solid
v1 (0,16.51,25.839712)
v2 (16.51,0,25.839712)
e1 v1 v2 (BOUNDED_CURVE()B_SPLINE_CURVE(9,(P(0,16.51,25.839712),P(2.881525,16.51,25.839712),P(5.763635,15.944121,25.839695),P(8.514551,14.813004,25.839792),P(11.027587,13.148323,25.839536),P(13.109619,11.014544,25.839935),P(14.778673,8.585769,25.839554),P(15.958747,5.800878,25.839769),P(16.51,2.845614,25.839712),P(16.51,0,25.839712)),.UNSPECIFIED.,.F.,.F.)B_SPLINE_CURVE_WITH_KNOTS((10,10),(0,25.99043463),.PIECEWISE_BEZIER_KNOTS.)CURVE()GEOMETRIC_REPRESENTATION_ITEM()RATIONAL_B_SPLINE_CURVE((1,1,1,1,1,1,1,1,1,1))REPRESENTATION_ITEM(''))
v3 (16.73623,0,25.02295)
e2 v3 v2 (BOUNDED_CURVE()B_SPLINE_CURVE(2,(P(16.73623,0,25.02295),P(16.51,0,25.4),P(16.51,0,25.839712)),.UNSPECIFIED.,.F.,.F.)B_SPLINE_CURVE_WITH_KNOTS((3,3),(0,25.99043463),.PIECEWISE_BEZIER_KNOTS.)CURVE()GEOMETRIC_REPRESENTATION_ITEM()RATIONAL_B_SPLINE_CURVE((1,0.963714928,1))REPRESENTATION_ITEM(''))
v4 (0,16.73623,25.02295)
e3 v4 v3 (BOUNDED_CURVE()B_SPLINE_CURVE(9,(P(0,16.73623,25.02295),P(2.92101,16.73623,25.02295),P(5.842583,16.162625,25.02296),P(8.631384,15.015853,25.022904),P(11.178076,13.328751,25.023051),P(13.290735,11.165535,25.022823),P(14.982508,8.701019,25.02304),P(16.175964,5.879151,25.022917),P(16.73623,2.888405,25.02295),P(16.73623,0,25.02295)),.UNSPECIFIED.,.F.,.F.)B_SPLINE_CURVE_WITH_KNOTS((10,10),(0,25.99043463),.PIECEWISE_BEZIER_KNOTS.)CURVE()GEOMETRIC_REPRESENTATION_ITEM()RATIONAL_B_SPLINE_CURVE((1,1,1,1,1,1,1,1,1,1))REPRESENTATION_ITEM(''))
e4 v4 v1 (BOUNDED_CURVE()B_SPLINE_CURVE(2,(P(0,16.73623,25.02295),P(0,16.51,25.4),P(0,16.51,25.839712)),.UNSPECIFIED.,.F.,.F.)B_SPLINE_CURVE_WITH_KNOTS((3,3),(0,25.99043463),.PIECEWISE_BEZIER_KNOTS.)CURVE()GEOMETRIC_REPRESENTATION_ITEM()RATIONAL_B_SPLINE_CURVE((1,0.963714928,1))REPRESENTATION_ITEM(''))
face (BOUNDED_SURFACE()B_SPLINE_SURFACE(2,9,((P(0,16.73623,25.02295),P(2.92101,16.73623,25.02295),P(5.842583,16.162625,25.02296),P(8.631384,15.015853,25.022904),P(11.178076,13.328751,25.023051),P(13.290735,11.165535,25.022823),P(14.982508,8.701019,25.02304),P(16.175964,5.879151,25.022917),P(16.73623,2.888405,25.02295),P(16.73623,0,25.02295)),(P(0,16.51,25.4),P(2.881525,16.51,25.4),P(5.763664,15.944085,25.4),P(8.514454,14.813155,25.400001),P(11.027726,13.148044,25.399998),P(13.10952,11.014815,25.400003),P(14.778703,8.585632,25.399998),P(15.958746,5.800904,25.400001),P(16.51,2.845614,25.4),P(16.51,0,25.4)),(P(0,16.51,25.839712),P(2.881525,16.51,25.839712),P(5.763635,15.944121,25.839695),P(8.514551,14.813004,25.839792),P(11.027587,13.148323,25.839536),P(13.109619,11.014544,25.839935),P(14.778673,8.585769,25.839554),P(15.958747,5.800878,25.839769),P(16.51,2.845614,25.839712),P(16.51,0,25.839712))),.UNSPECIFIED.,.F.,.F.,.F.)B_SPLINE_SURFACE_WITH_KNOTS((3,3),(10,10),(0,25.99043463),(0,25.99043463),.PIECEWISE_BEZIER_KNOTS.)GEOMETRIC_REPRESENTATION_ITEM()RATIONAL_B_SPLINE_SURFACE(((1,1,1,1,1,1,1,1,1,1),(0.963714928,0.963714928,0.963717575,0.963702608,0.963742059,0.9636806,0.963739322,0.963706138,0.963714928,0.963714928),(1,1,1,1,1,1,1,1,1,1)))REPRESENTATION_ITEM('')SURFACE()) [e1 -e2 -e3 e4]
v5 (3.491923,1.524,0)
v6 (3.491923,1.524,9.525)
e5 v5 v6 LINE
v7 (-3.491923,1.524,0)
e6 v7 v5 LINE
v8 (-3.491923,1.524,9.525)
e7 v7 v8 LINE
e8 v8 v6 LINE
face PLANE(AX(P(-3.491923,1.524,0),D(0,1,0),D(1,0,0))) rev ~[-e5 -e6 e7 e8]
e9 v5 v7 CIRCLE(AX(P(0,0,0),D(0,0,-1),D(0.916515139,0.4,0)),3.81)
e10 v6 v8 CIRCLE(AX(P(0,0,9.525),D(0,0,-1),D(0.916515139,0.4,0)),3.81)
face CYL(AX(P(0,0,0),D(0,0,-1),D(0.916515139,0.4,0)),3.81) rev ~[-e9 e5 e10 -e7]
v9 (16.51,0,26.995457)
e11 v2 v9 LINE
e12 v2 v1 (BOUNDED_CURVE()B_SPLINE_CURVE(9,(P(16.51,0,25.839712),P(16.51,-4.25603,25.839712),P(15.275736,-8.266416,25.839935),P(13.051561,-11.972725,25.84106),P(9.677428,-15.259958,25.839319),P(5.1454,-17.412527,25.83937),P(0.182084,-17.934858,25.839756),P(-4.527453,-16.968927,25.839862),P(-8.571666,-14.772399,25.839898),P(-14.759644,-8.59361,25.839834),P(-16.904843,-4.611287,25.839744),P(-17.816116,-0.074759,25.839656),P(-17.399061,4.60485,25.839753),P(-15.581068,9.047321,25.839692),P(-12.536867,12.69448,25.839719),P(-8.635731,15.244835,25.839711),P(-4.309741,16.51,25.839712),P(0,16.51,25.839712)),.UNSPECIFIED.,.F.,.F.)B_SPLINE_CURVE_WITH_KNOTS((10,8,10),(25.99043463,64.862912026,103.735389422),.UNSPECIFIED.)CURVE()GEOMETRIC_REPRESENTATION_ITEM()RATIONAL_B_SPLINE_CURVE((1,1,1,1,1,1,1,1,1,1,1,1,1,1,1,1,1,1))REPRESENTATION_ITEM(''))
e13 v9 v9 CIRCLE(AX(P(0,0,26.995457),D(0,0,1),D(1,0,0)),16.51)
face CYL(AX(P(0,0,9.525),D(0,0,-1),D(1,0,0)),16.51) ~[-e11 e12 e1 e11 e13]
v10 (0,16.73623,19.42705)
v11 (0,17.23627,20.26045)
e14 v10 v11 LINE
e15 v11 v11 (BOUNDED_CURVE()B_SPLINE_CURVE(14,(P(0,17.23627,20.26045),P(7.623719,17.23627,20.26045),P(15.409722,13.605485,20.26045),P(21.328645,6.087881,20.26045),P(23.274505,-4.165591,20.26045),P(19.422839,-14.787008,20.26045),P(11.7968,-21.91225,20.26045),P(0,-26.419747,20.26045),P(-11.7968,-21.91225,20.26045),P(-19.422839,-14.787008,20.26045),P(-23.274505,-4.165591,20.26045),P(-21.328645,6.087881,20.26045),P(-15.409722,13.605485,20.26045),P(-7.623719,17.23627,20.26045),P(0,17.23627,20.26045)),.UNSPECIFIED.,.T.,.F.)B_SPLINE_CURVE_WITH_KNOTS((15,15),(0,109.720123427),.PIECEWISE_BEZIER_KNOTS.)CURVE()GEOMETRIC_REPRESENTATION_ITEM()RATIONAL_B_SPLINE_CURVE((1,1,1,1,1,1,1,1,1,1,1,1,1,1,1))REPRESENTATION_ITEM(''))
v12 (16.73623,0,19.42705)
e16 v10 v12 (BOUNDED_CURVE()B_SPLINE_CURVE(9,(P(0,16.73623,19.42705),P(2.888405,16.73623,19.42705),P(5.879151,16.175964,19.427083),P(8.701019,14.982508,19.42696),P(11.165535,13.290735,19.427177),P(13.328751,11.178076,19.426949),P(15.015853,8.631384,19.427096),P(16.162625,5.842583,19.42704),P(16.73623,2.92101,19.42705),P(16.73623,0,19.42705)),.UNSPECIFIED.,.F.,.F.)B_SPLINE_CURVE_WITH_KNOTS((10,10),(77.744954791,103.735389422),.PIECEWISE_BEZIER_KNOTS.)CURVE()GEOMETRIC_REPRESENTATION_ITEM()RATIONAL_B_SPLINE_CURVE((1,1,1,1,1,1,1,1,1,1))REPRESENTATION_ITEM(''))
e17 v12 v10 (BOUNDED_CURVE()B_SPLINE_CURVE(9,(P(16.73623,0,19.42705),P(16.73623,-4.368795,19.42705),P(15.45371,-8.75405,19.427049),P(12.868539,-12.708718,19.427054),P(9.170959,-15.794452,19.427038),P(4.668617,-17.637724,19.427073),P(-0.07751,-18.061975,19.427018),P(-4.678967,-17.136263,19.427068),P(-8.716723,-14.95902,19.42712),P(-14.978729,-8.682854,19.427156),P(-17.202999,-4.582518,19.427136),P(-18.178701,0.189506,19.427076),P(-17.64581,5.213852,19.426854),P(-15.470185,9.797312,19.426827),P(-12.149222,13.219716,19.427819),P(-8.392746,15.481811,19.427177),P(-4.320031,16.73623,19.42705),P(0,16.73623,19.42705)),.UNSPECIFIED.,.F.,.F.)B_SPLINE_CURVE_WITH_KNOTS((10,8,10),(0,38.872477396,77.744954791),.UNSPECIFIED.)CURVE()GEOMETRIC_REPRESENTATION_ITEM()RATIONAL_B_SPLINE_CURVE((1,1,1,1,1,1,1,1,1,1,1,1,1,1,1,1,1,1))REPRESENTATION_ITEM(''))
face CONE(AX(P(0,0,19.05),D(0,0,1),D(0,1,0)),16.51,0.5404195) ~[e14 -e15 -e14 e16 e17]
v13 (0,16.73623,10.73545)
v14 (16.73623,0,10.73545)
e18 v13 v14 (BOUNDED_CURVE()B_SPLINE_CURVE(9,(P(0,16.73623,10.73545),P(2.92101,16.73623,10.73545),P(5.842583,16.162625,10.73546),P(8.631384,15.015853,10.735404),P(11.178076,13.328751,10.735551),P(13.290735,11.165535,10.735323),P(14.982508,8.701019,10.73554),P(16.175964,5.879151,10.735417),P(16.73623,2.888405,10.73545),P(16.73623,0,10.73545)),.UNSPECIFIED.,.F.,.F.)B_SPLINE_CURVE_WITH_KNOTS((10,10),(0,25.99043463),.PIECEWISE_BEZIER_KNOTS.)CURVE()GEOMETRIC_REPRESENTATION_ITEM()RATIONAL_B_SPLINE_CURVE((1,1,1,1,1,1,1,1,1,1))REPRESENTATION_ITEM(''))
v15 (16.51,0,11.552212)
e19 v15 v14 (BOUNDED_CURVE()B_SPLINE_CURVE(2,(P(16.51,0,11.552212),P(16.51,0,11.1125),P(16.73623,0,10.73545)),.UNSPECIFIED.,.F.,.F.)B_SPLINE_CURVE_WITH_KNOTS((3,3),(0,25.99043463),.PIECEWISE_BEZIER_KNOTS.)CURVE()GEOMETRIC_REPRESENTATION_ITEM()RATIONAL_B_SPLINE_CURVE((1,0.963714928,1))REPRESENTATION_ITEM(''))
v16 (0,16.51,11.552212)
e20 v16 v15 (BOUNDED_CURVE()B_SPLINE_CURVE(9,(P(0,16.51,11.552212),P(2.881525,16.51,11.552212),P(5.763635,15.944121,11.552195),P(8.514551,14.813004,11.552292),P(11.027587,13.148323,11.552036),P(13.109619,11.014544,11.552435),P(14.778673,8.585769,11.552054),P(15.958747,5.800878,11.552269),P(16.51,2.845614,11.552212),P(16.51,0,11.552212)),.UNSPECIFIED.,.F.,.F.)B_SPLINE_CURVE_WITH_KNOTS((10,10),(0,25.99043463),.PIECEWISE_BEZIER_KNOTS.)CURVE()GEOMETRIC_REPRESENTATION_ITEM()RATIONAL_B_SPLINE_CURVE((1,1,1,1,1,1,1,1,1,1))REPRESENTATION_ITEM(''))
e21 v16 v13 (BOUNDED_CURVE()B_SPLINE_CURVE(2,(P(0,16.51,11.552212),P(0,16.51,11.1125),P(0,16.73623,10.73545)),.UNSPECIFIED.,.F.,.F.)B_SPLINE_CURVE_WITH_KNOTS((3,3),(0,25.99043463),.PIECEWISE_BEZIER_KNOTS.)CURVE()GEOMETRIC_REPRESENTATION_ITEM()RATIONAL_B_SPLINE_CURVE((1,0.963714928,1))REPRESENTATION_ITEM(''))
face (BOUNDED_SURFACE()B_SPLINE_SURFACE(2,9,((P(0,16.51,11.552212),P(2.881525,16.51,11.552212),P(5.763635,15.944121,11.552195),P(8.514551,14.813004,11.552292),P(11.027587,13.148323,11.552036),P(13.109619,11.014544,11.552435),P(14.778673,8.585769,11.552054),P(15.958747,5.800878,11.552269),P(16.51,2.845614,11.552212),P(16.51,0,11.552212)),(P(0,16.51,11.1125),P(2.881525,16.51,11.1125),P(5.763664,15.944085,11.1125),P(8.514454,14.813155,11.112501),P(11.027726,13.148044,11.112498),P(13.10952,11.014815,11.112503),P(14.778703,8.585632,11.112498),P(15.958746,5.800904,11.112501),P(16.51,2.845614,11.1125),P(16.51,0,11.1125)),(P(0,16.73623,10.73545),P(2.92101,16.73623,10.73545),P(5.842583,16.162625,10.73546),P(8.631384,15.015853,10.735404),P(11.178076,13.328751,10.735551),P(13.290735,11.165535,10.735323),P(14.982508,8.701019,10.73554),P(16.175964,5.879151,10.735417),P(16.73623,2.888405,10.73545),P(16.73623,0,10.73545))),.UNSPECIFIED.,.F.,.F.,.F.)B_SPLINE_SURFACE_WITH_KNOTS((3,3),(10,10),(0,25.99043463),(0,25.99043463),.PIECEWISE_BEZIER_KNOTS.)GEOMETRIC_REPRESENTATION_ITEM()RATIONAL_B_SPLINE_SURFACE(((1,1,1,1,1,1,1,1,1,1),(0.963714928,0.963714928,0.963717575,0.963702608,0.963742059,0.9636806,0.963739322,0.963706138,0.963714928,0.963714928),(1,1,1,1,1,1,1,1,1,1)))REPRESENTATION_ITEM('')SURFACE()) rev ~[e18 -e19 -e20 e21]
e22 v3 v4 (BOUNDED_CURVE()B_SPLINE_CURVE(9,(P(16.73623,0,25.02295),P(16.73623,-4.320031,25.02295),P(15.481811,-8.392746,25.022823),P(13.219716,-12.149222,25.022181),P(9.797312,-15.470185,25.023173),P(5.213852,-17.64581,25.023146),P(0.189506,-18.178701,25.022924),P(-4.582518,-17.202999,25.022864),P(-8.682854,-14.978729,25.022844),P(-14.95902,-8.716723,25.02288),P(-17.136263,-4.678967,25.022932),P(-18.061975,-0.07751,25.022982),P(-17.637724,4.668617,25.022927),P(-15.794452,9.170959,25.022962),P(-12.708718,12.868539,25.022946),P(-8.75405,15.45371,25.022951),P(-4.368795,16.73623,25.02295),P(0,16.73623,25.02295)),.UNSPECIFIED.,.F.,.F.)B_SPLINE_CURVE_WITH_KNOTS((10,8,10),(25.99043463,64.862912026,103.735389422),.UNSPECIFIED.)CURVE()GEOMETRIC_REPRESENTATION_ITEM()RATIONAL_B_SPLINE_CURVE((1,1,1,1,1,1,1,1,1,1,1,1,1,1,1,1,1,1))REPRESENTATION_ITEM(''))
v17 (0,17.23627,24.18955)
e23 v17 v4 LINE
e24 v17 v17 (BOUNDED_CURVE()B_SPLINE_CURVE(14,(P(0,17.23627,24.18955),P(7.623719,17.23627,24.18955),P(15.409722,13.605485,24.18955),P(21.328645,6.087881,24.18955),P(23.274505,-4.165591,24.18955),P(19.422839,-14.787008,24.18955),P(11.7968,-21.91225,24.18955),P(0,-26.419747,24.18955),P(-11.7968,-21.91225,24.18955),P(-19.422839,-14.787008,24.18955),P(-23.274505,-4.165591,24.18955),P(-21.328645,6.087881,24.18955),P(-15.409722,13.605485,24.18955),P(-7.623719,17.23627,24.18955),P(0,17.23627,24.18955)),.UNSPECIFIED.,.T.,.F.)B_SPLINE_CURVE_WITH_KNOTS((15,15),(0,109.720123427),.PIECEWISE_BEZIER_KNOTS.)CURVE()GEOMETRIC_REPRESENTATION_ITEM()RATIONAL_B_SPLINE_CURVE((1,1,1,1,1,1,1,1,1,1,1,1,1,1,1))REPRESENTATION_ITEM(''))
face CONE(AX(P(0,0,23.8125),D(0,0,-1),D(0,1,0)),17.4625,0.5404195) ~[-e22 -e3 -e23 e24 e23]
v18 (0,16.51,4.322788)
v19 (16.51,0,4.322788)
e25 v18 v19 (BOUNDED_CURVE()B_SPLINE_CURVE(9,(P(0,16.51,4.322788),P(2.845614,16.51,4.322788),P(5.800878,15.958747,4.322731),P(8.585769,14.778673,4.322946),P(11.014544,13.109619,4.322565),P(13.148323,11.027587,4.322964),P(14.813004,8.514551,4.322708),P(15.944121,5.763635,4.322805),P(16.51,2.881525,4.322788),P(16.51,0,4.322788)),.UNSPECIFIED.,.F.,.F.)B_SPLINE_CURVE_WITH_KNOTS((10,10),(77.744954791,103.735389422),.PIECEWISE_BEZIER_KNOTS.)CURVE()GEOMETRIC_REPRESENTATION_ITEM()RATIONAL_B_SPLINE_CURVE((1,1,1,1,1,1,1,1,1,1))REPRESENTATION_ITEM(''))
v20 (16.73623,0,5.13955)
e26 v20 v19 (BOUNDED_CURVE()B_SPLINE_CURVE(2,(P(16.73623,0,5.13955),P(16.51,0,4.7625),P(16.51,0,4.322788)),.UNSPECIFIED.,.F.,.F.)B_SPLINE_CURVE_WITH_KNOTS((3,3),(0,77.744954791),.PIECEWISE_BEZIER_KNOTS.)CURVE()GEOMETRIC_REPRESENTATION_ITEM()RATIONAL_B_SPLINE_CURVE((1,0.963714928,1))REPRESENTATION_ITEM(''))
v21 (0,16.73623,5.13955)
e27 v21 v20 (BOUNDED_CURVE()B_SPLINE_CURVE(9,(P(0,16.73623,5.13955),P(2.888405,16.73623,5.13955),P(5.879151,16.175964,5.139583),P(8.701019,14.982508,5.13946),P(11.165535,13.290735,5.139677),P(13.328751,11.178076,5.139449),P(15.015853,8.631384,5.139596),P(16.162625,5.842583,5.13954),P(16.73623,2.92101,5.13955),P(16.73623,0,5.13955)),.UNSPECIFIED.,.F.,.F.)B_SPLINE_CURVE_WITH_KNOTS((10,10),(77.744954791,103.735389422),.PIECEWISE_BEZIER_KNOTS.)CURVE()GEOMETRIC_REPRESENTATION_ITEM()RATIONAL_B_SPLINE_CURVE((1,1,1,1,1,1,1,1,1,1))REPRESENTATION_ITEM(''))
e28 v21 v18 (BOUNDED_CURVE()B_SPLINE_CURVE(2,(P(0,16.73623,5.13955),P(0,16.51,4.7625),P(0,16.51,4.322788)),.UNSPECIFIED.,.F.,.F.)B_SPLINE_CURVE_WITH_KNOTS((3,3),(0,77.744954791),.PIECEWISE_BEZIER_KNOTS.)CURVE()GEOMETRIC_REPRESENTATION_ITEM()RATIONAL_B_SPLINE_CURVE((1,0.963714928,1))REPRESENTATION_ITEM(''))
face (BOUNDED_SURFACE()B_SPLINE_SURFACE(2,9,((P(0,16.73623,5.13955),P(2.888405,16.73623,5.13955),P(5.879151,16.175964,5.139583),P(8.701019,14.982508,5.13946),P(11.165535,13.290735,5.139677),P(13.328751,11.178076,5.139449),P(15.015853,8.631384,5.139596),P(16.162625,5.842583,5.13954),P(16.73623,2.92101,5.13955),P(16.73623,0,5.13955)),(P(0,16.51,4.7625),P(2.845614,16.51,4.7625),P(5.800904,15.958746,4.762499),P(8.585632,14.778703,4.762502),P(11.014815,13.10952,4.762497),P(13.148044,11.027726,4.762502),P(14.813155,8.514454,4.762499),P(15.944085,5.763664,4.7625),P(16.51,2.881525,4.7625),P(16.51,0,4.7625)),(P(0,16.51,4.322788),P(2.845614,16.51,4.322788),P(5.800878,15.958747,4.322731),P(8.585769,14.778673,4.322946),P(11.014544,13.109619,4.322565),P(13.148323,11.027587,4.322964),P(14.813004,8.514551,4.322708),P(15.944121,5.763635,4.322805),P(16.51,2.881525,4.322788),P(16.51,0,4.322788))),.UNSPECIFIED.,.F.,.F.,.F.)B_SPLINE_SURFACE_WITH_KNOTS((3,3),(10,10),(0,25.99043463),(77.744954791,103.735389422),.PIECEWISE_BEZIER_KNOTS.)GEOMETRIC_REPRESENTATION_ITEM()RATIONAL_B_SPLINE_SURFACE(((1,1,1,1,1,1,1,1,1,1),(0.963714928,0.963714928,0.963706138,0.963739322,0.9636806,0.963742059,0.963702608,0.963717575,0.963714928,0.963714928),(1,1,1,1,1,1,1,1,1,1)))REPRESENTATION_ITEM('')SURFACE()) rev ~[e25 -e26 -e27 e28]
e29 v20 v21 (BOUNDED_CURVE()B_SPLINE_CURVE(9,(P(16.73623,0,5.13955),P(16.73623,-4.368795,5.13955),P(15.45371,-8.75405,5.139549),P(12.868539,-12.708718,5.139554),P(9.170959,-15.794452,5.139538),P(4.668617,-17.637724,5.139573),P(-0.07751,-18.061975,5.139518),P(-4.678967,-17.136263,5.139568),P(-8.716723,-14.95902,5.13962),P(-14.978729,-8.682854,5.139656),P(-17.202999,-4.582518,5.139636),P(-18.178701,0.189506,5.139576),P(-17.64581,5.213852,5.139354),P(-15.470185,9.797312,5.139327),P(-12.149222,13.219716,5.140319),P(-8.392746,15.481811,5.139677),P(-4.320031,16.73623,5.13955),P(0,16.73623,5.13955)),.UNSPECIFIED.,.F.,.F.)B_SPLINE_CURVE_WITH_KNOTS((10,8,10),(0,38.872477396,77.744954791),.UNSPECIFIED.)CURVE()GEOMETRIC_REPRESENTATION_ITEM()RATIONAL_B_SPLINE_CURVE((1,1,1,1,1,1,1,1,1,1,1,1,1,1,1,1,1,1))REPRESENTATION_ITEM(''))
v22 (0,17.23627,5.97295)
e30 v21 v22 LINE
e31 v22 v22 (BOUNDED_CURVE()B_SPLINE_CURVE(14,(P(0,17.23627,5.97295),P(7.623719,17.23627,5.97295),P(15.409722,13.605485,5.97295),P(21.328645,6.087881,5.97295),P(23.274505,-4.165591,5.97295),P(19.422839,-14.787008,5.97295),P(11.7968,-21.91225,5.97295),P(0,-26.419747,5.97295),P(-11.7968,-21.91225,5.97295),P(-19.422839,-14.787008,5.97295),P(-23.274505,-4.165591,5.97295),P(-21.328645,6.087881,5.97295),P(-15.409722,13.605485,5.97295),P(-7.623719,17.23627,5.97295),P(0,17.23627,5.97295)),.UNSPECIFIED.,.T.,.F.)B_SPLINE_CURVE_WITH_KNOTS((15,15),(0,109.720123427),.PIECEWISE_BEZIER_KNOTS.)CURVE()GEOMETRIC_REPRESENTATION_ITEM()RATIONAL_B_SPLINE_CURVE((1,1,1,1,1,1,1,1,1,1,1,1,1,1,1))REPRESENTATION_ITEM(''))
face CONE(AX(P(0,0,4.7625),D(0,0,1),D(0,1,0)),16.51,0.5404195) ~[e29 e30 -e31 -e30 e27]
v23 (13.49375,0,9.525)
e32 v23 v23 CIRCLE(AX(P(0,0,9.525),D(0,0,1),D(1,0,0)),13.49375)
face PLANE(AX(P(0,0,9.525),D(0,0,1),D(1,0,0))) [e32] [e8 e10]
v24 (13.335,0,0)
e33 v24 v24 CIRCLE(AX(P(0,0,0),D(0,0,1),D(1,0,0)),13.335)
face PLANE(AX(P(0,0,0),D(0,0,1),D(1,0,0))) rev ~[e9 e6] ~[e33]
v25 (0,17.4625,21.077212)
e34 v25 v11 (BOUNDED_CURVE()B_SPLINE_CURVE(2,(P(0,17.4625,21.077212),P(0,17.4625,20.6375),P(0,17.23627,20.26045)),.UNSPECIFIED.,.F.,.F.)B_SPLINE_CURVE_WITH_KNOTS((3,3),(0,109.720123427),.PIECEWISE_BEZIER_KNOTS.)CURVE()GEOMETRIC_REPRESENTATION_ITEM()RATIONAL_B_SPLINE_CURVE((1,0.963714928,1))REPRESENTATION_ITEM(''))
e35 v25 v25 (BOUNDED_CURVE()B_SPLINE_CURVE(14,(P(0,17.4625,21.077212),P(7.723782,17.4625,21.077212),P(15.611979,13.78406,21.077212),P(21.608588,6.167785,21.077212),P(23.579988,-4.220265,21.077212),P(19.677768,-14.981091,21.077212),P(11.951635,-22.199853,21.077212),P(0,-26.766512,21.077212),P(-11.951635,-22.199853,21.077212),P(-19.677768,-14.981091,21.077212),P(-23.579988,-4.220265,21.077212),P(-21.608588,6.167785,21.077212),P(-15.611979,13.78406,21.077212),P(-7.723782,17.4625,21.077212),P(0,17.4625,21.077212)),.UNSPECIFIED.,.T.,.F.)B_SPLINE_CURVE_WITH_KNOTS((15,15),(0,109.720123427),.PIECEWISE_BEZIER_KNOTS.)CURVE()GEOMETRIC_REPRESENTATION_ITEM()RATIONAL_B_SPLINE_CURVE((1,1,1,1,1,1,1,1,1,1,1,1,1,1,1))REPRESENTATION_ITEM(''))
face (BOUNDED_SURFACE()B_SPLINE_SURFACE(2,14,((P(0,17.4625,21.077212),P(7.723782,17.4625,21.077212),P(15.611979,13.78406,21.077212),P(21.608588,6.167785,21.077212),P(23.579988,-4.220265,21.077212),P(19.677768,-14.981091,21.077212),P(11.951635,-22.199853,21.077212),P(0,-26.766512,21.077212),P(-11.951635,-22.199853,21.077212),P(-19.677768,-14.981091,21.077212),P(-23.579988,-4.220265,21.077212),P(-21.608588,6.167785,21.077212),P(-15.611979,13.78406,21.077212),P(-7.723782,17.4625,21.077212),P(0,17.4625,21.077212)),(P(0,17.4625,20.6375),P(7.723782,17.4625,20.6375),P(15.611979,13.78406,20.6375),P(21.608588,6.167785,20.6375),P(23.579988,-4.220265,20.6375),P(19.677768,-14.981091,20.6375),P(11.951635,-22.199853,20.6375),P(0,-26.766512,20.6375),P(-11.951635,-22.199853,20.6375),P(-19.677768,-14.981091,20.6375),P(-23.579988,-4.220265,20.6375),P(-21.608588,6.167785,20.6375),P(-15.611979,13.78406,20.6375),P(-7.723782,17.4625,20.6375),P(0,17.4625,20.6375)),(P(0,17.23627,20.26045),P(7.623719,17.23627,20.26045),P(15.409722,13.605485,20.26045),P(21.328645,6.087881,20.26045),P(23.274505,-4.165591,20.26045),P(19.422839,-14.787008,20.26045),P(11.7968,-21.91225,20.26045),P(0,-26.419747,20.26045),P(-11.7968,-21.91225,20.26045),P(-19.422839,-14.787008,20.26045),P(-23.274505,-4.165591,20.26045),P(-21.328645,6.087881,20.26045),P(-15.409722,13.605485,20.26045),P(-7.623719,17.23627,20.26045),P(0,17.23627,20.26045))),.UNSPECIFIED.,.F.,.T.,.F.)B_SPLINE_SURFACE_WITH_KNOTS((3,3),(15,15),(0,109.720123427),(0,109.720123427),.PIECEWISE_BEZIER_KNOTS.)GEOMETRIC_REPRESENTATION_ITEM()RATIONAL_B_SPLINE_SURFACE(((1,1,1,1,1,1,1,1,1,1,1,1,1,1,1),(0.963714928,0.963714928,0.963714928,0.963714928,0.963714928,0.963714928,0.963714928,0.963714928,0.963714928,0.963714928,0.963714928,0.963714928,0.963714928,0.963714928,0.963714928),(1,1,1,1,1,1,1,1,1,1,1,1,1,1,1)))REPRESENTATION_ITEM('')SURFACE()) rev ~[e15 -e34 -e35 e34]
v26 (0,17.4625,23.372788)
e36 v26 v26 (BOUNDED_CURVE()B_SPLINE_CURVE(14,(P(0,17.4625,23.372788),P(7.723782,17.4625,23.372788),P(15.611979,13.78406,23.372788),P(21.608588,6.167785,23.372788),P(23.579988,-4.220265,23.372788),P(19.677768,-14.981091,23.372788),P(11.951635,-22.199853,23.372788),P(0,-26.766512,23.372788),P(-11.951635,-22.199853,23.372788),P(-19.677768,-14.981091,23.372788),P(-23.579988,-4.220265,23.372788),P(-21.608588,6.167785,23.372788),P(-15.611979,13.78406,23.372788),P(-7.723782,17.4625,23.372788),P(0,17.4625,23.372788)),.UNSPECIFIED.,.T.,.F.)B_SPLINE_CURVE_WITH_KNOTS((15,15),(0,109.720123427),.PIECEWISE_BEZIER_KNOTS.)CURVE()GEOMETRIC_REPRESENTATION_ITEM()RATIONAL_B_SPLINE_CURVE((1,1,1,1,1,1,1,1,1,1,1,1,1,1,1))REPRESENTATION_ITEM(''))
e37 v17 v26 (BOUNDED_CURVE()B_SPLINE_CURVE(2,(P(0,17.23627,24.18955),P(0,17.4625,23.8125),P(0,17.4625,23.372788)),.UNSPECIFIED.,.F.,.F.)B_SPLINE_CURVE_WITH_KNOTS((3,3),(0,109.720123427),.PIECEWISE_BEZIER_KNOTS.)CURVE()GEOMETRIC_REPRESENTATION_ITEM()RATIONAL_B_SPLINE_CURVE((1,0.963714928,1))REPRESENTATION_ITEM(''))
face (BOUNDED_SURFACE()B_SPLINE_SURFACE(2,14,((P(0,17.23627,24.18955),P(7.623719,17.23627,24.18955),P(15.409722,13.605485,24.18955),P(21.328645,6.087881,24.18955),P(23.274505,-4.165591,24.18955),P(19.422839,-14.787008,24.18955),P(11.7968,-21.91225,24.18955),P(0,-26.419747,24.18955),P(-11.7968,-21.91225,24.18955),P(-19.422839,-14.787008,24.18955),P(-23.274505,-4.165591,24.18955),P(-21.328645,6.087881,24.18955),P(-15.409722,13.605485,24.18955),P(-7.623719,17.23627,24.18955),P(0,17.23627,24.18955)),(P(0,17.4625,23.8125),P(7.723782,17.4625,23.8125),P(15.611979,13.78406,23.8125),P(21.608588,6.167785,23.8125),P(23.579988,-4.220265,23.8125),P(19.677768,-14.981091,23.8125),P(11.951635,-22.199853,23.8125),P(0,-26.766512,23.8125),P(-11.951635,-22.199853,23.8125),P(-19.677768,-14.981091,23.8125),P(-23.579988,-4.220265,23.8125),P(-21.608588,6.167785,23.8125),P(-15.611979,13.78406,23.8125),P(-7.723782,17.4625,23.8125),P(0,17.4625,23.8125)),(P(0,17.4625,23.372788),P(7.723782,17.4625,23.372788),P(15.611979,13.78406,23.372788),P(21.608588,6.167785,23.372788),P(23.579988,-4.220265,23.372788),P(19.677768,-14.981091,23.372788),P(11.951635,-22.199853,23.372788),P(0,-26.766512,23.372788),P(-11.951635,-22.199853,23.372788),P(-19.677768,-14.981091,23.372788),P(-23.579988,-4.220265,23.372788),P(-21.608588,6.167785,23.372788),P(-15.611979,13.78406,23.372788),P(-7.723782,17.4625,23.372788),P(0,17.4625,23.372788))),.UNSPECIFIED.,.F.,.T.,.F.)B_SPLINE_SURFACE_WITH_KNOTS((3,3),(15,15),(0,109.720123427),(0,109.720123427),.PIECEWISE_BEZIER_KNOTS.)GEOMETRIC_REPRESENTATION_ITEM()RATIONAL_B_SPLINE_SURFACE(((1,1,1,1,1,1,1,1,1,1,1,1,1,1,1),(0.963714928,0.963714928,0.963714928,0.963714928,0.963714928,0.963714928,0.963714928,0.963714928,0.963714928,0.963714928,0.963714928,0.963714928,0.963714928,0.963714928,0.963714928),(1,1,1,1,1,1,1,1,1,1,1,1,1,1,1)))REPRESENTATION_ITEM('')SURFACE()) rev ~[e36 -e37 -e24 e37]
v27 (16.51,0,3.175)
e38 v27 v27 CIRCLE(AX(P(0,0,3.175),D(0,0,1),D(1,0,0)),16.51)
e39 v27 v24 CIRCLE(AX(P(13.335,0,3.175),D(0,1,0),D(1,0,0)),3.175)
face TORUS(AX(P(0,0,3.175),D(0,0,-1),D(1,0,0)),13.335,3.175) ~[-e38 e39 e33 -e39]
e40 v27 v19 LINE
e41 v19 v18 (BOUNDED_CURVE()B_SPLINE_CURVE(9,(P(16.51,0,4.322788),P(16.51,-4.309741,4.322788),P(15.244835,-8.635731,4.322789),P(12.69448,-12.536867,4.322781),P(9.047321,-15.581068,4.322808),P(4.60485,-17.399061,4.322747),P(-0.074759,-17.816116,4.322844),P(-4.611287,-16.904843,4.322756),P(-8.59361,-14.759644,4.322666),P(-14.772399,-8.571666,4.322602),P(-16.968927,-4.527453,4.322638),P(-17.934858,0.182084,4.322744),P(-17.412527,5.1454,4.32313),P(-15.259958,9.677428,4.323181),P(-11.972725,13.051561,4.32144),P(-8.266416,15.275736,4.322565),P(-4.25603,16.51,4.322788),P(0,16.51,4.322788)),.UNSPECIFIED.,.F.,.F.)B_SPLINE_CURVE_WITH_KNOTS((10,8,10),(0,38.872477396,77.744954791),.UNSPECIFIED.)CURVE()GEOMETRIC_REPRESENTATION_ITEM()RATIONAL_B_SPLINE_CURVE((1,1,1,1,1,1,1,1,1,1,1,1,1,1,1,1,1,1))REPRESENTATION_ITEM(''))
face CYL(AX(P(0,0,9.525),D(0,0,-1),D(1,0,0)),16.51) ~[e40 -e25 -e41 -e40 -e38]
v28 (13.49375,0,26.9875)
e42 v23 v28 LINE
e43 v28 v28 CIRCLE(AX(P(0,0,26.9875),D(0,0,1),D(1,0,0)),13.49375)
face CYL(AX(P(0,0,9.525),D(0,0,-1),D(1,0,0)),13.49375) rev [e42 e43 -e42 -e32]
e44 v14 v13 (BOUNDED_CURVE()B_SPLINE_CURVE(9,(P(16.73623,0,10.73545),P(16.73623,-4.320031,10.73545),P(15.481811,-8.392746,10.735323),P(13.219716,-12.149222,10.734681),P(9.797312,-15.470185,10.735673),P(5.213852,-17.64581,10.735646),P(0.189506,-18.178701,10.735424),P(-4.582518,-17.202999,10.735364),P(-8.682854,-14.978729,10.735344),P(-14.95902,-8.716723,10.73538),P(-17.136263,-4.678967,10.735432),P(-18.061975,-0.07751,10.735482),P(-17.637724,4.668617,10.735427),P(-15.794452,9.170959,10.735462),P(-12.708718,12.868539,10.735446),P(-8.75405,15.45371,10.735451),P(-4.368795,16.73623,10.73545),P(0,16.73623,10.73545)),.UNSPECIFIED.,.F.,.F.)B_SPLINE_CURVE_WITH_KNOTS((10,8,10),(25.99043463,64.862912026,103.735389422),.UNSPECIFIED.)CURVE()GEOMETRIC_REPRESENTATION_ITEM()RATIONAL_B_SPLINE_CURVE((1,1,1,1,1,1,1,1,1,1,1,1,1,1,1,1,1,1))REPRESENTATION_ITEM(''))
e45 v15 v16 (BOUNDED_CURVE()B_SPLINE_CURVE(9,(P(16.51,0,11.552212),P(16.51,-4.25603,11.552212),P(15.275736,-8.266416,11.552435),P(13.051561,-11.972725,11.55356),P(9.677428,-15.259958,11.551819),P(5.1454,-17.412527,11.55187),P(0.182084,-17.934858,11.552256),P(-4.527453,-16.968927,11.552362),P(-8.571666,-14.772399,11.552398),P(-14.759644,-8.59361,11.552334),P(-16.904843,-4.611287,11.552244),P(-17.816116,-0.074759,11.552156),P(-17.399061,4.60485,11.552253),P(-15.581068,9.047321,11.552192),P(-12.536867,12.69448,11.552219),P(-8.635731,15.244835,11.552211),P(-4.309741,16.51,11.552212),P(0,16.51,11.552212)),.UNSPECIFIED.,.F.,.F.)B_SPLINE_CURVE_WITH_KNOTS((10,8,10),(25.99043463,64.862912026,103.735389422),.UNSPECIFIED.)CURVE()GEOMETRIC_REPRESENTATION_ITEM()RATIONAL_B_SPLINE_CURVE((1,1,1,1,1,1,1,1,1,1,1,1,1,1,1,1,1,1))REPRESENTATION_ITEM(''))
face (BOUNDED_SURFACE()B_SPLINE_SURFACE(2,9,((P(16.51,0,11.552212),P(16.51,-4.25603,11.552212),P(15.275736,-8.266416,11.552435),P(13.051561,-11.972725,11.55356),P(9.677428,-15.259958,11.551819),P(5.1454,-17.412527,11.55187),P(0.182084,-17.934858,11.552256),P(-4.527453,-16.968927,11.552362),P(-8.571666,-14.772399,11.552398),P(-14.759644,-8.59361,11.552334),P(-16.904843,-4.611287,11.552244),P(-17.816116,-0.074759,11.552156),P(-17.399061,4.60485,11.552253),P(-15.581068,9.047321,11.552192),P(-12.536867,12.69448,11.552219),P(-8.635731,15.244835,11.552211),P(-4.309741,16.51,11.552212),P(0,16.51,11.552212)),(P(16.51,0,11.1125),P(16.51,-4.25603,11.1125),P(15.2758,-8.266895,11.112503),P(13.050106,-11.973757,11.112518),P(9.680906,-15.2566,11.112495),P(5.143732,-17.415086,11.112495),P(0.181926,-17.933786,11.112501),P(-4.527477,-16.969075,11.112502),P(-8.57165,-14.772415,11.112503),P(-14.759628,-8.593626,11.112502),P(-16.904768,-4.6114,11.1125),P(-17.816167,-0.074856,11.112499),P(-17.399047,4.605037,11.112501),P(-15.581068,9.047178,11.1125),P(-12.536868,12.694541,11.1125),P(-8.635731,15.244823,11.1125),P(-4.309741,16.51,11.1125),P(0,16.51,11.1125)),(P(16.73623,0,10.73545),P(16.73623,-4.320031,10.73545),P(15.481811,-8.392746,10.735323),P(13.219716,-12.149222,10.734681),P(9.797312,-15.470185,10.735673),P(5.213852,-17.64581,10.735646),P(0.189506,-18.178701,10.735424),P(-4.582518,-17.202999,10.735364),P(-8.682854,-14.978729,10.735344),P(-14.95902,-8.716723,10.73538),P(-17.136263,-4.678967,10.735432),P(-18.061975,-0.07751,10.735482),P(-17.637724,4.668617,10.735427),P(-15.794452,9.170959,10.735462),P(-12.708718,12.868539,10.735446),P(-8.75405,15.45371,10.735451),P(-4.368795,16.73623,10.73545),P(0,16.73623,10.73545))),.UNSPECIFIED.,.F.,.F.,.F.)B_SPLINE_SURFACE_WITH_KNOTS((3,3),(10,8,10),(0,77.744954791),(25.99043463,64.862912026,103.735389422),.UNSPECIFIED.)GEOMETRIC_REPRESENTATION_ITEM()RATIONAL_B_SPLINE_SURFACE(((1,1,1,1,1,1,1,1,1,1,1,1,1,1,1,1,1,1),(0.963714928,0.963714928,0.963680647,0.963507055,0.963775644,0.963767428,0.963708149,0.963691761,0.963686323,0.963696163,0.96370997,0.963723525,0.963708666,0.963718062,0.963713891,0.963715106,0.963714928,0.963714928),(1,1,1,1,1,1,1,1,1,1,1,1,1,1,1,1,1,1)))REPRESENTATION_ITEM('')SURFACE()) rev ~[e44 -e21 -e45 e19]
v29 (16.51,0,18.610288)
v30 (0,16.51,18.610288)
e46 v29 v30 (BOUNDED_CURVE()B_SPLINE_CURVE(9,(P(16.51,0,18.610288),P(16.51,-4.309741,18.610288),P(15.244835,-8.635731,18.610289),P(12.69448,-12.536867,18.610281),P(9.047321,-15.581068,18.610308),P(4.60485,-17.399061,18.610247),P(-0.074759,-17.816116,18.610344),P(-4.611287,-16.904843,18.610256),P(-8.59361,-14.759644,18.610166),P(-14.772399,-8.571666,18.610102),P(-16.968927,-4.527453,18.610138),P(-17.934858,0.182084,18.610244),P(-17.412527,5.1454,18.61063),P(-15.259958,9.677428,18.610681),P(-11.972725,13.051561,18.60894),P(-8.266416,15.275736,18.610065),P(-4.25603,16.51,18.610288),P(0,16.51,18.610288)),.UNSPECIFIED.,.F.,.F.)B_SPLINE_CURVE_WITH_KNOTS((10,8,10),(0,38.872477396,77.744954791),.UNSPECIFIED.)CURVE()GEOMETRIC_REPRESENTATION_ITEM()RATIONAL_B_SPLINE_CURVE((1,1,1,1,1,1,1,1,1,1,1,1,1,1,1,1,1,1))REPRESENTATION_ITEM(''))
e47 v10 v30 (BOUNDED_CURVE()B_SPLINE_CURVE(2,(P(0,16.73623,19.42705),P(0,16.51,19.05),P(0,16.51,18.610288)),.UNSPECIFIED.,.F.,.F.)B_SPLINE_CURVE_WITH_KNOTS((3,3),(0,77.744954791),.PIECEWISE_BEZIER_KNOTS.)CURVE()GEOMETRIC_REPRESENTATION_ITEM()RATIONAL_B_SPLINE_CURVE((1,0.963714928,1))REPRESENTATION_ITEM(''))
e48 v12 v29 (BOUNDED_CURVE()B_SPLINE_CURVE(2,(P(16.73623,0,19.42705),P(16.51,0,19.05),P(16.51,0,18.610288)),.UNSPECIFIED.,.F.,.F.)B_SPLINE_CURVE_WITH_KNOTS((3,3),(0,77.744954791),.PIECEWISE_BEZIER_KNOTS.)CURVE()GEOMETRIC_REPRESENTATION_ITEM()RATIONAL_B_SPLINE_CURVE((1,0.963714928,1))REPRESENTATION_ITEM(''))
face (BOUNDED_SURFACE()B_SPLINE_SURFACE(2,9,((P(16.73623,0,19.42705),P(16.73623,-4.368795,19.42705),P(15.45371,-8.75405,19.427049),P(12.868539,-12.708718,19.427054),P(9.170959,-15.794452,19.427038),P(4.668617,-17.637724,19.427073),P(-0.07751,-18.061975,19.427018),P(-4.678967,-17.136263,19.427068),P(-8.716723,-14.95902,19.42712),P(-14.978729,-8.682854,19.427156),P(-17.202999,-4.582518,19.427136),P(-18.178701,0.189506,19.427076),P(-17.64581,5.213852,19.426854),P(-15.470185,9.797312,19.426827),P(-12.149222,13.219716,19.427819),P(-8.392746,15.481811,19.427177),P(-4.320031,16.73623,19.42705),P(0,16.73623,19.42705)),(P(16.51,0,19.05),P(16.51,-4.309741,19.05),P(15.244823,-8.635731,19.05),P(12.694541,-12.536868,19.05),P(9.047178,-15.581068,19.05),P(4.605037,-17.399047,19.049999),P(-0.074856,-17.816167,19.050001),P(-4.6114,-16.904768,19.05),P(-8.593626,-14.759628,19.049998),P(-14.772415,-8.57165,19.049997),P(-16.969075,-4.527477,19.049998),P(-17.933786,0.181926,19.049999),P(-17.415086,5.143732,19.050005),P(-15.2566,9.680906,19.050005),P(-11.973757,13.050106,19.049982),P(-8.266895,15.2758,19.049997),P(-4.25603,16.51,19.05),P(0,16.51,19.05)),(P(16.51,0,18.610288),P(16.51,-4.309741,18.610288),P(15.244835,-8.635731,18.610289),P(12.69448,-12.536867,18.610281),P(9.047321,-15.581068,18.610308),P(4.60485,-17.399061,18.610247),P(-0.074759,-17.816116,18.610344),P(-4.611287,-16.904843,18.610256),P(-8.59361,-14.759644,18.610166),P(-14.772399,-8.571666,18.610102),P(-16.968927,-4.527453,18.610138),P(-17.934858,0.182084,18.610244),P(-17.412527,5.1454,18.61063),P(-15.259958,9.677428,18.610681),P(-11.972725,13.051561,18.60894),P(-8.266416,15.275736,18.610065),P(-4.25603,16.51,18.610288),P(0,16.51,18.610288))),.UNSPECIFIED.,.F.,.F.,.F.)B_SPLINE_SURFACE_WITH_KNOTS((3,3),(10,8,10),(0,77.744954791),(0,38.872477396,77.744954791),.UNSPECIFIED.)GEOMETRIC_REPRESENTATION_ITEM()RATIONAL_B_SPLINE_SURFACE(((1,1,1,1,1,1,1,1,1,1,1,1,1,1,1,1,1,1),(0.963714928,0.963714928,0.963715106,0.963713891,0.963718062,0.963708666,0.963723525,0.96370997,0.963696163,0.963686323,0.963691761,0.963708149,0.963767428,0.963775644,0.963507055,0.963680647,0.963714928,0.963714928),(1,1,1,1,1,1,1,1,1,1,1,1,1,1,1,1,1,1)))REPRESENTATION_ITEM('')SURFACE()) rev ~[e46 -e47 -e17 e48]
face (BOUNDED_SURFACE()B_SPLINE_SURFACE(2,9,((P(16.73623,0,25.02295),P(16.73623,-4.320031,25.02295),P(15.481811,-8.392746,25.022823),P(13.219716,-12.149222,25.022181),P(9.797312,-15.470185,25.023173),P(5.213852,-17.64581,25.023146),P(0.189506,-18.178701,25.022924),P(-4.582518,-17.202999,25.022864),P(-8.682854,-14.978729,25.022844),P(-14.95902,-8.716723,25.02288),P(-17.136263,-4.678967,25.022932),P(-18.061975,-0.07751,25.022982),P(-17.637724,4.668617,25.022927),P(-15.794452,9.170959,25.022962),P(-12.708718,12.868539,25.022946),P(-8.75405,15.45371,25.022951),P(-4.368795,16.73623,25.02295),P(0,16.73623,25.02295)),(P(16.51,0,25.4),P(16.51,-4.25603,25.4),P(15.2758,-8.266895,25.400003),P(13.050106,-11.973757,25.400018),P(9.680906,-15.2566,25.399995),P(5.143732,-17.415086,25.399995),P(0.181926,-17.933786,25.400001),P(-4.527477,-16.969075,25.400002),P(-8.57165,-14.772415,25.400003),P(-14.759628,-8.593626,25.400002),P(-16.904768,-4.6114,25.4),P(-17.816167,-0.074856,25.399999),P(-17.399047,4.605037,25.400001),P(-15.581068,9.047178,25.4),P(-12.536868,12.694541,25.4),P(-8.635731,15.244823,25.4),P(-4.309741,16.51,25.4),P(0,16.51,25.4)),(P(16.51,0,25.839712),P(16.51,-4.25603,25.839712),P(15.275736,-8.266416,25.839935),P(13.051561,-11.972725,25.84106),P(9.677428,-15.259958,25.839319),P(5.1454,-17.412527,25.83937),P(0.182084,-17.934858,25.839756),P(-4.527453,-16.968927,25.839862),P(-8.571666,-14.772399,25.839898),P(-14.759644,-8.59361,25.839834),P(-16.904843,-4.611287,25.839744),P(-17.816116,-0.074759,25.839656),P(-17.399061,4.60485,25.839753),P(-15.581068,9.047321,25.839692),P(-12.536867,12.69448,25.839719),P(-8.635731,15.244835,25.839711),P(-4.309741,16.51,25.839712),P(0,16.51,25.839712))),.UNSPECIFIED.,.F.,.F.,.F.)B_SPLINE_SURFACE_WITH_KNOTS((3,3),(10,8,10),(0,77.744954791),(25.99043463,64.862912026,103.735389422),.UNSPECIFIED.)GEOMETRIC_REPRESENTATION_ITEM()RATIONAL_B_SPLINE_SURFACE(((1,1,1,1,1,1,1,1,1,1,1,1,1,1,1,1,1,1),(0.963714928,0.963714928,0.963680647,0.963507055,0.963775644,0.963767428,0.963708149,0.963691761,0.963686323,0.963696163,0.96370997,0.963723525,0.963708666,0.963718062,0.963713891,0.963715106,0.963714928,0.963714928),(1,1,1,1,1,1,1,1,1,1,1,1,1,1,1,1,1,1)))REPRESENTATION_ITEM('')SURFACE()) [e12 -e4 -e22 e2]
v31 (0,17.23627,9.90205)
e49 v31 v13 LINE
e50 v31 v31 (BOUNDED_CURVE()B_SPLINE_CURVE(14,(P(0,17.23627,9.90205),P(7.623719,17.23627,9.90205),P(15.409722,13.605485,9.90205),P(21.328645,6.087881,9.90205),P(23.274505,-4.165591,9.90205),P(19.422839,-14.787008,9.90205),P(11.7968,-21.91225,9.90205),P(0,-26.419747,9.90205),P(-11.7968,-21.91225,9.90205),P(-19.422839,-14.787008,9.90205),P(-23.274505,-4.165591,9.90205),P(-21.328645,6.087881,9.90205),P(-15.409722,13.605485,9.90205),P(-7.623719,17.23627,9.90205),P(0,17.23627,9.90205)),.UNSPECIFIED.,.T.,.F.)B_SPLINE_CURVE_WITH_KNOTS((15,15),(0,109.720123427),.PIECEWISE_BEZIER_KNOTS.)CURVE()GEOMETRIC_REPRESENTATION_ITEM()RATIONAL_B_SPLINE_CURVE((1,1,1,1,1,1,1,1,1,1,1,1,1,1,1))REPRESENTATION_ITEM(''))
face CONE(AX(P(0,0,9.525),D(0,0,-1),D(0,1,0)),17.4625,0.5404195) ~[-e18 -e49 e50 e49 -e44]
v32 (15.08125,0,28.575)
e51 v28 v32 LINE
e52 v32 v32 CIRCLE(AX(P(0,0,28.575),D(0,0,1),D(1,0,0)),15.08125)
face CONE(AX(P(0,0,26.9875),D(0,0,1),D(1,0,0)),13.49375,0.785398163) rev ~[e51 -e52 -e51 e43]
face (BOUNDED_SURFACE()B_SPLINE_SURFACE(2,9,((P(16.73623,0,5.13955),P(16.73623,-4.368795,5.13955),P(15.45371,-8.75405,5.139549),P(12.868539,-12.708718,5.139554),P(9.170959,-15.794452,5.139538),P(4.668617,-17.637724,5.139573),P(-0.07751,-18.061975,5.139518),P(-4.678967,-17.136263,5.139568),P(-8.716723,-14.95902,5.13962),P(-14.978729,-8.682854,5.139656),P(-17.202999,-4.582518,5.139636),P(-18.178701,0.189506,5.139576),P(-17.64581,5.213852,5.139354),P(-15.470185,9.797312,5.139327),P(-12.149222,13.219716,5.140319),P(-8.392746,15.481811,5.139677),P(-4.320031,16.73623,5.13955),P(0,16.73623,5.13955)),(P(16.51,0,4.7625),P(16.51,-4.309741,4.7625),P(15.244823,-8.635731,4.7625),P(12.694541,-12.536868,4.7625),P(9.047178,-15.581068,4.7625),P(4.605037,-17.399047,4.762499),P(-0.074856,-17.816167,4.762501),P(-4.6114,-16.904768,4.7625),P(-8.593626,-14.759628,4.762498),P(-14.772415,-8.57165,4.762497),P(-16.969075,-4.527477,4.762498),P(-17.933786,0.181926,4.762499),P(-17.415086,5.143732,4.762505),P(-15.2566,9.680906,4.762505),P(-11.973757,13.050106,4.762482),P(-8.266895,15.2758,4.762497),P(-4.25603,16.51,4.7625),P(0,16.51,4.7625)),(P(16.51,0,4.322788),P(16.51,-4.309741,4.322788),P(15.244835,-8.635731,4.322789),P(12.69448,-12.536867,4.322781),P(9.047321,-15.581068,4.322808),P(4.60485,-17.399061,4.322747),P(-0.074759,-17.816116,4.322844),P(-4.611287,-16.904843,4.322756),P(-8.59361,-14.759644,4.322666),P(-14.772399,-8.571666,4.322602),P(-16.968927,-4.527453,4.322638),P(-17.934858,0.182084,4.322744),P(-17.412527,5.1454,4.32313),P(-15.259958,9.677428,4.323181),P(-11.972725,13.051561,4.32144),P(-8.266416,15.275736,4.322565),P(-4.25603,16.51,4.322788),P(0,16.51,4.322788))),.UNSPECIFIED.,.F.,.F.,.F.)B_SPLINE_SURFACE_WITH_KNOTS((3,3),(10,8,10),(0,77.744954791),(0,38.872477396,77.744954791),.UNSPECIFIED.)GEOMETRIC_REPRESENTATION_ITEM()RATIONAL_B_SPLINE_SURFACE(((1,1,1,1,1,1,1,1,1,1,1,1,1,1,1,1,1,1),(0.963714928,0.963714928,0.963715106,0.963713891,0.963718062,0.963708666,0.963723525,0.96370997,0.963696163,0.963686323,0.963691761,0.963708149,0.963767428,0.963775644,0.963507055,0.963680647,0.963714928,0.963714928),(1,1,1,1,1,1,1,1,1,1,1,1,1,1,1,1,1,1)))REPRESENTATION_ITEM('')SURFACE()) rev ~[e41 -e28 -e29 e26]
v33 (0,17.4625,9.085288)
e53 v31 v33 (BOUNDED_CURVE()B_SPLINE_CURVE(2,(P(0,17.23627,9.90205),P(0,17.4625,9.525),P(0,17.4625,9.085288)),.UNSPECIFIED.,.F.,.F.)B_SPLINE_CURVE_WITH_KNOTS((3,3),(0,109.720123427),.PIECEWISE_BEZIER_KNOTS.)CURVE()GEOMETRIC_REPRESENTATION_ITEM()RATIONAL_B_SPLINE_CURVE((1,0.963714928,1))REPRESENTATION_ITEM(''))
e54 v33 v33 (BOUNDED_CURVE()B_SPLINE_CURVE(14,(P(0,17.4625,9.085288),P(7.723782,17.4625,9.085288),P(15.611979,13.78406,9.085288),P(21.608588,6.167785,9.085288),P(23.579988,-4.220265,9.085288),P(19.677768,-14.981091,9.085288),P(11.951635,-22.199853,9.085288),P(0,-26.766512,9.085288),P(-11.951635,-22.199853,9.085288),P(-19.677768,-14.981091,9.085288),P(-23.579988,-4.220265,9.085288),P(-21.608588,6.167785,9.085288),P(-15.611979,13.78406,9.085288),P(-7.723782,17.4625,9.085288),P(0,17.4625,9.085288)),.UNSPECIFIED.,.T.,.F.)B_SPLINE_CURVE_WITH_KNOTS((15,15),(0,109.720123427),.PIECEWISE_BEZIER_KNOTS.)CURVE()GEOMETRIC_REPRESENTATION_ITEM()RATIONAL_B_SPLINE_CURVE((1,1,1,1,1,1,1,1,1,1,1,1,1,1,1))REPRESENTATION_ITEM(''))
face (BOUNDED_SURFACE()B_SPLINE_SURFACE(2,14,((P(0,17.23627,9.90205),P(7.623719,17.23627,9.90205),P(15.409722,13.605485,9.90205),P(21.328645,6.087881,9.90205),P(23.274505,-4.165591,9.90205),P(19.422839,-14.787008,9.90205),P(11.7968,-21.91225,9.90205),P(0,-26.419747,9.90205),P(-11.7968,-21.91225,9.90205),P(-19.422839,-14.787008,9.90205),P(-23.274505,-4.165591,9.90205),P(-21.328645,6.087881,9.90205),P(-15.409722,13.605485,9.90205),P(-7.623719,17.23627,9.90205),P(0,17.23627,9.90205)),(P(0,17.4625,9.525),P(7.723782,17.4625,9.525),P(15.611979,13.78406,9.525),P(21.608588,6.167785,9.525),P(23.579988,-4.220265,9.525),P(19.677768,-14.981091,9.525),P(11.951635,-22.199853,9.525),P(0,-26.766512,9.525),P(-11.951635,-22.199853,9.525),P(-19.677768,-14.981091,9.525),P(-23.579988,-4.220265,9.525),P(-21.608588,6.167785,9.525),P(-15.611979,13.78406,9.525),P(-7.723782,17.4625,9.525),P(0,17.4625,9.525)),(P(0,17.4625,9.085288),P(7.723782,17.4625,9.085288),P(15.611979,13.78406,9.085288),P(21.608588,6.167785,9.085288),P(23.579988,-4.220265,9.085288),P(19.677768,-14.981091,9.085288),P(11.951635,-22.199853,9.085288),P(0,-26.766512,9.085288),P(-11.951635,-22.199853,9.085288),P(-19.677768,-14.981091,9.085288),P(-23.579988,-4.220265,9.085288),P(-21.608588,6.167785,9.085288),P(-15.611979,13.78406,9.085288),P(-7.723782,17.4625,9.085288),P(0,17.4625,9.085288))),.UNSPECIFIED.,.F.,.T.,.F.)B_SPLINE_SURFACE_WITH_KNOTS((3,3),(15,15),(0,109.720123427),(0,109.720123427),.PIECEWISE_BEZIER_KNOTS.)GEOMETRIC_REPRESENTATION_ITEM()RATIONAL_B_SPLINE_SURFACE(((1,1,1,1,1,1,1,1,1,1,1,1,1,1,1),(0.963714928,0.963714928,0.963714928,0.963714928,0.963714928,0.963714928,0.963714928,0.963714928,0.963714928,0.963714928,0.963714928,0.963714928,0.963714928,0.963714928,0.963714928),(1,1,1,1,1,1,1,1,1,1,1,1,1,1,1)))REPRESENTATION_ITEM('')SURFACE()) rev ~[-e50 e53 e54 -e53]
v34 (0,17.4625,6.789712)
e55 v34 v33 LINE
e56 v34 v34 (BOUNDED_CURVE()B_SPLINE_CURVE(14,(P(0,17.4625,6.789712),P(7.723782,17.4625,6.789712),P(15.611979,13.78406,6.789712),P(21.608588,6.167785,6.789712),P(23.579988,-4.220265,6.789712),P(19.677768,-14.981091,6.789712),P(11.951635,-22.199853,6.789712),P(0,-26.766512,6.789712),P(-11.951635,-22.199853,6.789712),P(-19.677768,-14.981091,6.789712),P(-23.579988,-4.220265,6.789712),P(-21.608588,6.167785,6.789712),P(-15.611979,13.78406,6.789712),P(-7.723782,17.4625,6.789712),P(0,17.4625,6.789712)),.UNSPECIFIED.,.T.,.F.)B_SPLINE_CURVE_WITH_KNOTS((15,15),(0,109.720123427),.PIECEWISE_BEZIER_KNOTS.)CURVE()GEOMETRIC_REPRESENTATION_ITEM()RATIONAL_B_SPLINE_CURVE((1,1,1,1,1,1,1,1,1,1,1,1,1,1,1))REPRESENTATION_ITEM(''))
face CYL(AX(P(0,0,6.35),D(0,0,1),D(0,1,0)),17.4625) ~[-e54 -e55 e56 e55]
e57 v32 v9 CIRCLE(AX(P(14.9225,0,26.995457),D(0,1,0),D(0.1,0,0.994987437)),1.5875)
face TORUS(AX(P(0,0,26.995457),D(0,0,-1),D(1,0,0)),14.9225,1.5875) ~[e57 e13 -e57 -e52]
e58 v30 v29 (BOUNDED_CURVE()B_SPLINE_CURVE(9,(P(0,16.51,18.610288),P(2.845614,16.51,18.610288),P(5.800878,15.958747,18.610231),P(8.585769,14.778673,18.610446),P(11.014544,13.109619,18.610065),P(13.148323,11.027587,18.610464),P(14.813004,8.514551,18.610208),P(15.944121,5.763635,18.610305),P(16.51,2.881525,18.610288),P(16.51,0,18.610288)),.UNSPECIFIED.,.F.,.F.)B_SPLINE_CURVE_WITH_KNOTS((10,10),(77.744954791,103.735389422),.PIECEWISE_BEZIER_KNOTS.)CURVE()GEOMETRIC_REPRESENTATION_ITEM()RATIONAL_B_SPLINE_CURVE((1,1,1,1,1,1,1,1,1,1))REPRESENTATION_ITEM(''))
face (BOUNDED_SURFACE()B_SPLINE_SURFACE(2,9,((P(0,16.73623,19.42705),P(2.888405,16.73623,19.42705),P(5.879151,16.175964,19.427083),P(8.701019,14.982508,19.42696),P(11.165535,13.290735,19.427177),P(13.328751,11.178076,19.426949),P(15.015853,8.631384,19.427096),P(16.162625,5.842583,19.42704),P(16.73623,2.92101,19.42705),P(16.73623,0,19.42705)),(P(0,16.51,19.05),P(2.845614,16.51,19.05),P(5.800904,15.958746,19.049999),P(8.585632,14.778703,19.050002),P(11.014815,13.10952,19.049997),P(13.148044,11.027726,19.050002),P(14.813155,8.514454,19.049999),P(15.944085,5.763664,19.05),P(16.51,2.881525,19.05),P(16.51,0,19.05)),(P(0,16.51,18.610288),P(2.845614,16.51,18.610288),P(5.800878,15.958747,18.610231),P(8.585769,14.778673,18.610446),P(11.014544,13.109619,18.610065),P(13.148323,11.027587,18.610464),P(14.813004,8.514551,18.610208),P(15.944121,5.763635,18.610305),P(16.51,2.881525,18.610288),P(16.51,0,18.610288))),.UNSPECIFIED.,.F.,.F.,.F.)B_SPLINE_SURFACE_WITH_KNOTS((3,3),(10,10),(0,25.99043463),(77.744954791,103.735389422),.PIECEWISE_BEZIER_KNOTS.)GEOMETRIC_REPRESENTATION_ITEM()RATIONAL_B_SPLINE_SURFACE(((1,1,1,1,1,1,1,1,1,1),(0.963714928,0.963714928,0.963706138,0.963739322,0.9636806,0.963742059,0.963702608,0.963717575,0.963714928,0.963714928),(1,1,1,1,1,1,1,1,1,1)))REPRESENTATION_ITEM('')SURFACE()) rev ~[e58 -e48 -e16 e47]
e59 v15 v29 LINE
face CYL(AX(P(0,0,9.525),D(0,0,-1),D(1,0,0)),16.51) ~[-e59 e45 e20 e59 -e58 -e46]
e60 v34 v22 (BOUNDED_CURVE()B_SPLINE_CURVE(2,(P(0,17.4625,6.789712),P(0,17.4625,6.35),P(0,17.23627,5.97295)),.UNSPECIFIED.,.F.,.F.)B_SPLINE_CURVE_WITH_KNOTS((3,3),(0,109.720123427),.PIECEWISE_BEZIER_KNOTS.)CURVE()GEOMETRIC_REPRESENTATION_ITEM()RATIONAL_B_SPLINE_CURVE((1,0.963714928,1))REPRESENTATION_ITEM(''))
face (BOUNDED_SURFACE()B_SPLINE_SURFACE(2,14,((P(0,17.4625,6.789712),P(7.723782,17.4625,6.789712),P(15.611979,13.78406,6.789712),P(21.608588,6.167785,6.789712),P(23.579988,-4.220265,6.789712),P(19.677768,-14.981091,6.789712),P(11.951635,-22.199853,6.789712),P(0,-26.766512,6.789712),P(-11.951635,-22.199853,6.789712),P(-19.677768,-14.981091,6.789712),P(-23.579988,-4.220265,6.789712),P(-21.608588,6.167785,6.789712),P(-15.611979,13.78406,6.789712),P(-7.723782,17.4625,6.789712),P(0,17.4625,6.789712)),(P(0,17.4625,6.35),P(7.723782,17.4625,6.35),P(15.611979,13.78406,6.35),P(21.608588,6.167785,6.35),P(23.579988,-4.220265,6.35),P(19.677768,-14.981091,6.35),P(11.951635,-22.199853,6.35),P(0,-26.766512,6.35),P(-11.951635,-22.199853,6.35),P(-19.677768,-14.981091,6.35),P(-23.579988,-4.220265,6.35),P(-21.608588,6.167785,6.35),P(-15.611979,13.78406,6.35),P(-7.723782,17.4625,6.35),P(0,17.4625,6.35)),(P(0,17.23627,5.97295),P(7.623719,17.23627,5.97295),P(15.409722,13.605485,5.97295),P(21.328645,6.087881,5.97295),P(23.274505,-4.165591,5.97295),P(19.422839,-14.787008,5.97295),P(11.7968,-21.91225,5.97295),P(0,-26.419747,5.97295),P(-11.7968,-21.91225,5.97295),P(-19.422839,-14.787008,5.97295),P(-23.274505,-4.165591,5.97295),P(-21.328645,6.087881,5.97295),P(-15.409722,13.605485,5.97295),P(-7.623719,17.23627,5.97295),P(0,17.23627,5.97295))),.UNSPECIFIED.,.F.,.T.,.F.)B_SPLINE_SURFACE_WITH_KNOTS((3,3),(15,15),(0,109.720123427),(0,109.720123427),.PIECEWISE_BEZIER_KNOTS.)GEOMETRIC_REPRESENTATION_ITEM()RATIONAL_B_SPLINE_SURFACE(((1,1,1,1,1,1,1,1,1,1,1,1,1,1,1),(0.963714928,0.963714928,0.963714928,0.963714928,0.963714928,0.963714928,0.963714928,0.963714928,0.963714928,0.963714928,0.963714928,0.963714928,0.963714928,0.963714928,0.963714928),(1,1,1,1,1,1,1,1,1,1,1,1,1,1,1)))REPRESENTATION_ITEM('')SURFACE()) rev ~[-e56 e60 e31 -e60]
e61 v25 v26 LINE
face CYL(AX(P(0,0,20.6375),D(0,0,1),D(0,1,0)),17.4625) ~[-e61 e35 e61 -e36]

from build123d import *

# Parameters (mm, degrees)
F0_R     = 16.51
F1_DEPTH = 9.525
F2_R     = 16.51
F2_R_2   = 13.49375
F3_DEPTH = 19.05
F4_SIZE  = 1.5875
F6_R     = 3.175
F9_R     = 1.5875


# Not quite as in the source:
# - a fillet or chamfer that OpenCascade refuses, or shapes differently, is made with other operations: its cross-section is extruded or revolved along the edge and cut away or added


with BuildPart() as f1:
    # F0 (on Top) → F1 (new body)
    with BuildSketch(Plane.XY):
        Circle(F0_R)
        with BuildLine():
            ThreePointArc((3.4919226796, 1.524), (0, -3.81), (-3.4919226796, 1.524))
            Line((-3.4919226796, 1.524), (3.4919226796, 1.524))
        make_face(mode=Mode.SUBTRACT)
    extrude(amount=F1_DEPTH)

    # F2 (on face) → F3 (join)
    with BuildSketch(Plane.XY.offset(9.525)):
        Circle(F2_R)
        Circle(F2_R_2, mode=Mode.SUBTRACT)
    extrude(amount=F3_DEPTH)

    # F4
    f4_edges = [f1.edges().sort_by_distance(p)[0] for p in [
        (-13.49375, 0, 28.575),
    ]]
    chamfer(f4_edges, length=F4_SIZE)

    # F5: fillet of radius 1.5875 on 1 edges, made by hand

    # F5_s1 → F5_t2 (revolve, cut)
    with BuildSketch(Plane.XZ):
        with BuildLine():
            ThreePointArc((15.08125, 28.575), (16.0998215098, 28.0603848179), (16.51, 26.9954574436))
            Line((16.51, 26.9954574436), (16.51, 28.575))
            Line((16.51, 28.575), (15.08125, 28.575))
        make_face()
    revolve(axis=Axis((0, 0, 28.575), (0, 0, 1)), mode=Mode.SUBTRACT)

    # F6
    f6_edges = [f1.edges().sort_by_distance(p)[0] for p in [
        (-16.51, 0, 0),
    ]]
    fillet(f6_edges, radius=F6_R)

    # F7 (on Right) → F8 (revolve)
    with BuildSketch(Plane.YZ):
        Polygon((17.4625, 23.8125), (16.51, 25.4), (16.51, 19.05), (17.4625, 20.6375), align=None)
        Polygon((17.4625, 9.525), (16.51, 11.1125), (16.51, 4.7625), (17.4625, 6.35), align=None)
    revolve(axis=Axis((0, 0, 15.1199988206), (0, 0, -1)))

    # F9
    f9_edges = [f1.edges().sort_by_distance(p)[0] for p in [
        (0, -17.4625, 23.8125),
        (16.51, 0, 26.197729),
        (0, -17.4625, 20.6375),
        (-11.674333, -11.674333, 19.05),
        (16.51, 0, 15.08125),
        (0, -17.4625, 9.525),
        (0, -17.4625, 6.35),
        (-11.674333, -11.674333, 4.7625),
        (11.674333, 11.674333, 25.4),
        (-11.674333, -11.674333, 25.4),
        (11.674333, 11.674333, 19.05),
        (11.674333, 11.674333, 11.1125),
        (-11.674333, -11.674333, 11.1125),
        (11.674333, 11.674333, 4.7625),
    ]]
    fillet(f9_edges, radius=F9_R)


solid = f1.part
